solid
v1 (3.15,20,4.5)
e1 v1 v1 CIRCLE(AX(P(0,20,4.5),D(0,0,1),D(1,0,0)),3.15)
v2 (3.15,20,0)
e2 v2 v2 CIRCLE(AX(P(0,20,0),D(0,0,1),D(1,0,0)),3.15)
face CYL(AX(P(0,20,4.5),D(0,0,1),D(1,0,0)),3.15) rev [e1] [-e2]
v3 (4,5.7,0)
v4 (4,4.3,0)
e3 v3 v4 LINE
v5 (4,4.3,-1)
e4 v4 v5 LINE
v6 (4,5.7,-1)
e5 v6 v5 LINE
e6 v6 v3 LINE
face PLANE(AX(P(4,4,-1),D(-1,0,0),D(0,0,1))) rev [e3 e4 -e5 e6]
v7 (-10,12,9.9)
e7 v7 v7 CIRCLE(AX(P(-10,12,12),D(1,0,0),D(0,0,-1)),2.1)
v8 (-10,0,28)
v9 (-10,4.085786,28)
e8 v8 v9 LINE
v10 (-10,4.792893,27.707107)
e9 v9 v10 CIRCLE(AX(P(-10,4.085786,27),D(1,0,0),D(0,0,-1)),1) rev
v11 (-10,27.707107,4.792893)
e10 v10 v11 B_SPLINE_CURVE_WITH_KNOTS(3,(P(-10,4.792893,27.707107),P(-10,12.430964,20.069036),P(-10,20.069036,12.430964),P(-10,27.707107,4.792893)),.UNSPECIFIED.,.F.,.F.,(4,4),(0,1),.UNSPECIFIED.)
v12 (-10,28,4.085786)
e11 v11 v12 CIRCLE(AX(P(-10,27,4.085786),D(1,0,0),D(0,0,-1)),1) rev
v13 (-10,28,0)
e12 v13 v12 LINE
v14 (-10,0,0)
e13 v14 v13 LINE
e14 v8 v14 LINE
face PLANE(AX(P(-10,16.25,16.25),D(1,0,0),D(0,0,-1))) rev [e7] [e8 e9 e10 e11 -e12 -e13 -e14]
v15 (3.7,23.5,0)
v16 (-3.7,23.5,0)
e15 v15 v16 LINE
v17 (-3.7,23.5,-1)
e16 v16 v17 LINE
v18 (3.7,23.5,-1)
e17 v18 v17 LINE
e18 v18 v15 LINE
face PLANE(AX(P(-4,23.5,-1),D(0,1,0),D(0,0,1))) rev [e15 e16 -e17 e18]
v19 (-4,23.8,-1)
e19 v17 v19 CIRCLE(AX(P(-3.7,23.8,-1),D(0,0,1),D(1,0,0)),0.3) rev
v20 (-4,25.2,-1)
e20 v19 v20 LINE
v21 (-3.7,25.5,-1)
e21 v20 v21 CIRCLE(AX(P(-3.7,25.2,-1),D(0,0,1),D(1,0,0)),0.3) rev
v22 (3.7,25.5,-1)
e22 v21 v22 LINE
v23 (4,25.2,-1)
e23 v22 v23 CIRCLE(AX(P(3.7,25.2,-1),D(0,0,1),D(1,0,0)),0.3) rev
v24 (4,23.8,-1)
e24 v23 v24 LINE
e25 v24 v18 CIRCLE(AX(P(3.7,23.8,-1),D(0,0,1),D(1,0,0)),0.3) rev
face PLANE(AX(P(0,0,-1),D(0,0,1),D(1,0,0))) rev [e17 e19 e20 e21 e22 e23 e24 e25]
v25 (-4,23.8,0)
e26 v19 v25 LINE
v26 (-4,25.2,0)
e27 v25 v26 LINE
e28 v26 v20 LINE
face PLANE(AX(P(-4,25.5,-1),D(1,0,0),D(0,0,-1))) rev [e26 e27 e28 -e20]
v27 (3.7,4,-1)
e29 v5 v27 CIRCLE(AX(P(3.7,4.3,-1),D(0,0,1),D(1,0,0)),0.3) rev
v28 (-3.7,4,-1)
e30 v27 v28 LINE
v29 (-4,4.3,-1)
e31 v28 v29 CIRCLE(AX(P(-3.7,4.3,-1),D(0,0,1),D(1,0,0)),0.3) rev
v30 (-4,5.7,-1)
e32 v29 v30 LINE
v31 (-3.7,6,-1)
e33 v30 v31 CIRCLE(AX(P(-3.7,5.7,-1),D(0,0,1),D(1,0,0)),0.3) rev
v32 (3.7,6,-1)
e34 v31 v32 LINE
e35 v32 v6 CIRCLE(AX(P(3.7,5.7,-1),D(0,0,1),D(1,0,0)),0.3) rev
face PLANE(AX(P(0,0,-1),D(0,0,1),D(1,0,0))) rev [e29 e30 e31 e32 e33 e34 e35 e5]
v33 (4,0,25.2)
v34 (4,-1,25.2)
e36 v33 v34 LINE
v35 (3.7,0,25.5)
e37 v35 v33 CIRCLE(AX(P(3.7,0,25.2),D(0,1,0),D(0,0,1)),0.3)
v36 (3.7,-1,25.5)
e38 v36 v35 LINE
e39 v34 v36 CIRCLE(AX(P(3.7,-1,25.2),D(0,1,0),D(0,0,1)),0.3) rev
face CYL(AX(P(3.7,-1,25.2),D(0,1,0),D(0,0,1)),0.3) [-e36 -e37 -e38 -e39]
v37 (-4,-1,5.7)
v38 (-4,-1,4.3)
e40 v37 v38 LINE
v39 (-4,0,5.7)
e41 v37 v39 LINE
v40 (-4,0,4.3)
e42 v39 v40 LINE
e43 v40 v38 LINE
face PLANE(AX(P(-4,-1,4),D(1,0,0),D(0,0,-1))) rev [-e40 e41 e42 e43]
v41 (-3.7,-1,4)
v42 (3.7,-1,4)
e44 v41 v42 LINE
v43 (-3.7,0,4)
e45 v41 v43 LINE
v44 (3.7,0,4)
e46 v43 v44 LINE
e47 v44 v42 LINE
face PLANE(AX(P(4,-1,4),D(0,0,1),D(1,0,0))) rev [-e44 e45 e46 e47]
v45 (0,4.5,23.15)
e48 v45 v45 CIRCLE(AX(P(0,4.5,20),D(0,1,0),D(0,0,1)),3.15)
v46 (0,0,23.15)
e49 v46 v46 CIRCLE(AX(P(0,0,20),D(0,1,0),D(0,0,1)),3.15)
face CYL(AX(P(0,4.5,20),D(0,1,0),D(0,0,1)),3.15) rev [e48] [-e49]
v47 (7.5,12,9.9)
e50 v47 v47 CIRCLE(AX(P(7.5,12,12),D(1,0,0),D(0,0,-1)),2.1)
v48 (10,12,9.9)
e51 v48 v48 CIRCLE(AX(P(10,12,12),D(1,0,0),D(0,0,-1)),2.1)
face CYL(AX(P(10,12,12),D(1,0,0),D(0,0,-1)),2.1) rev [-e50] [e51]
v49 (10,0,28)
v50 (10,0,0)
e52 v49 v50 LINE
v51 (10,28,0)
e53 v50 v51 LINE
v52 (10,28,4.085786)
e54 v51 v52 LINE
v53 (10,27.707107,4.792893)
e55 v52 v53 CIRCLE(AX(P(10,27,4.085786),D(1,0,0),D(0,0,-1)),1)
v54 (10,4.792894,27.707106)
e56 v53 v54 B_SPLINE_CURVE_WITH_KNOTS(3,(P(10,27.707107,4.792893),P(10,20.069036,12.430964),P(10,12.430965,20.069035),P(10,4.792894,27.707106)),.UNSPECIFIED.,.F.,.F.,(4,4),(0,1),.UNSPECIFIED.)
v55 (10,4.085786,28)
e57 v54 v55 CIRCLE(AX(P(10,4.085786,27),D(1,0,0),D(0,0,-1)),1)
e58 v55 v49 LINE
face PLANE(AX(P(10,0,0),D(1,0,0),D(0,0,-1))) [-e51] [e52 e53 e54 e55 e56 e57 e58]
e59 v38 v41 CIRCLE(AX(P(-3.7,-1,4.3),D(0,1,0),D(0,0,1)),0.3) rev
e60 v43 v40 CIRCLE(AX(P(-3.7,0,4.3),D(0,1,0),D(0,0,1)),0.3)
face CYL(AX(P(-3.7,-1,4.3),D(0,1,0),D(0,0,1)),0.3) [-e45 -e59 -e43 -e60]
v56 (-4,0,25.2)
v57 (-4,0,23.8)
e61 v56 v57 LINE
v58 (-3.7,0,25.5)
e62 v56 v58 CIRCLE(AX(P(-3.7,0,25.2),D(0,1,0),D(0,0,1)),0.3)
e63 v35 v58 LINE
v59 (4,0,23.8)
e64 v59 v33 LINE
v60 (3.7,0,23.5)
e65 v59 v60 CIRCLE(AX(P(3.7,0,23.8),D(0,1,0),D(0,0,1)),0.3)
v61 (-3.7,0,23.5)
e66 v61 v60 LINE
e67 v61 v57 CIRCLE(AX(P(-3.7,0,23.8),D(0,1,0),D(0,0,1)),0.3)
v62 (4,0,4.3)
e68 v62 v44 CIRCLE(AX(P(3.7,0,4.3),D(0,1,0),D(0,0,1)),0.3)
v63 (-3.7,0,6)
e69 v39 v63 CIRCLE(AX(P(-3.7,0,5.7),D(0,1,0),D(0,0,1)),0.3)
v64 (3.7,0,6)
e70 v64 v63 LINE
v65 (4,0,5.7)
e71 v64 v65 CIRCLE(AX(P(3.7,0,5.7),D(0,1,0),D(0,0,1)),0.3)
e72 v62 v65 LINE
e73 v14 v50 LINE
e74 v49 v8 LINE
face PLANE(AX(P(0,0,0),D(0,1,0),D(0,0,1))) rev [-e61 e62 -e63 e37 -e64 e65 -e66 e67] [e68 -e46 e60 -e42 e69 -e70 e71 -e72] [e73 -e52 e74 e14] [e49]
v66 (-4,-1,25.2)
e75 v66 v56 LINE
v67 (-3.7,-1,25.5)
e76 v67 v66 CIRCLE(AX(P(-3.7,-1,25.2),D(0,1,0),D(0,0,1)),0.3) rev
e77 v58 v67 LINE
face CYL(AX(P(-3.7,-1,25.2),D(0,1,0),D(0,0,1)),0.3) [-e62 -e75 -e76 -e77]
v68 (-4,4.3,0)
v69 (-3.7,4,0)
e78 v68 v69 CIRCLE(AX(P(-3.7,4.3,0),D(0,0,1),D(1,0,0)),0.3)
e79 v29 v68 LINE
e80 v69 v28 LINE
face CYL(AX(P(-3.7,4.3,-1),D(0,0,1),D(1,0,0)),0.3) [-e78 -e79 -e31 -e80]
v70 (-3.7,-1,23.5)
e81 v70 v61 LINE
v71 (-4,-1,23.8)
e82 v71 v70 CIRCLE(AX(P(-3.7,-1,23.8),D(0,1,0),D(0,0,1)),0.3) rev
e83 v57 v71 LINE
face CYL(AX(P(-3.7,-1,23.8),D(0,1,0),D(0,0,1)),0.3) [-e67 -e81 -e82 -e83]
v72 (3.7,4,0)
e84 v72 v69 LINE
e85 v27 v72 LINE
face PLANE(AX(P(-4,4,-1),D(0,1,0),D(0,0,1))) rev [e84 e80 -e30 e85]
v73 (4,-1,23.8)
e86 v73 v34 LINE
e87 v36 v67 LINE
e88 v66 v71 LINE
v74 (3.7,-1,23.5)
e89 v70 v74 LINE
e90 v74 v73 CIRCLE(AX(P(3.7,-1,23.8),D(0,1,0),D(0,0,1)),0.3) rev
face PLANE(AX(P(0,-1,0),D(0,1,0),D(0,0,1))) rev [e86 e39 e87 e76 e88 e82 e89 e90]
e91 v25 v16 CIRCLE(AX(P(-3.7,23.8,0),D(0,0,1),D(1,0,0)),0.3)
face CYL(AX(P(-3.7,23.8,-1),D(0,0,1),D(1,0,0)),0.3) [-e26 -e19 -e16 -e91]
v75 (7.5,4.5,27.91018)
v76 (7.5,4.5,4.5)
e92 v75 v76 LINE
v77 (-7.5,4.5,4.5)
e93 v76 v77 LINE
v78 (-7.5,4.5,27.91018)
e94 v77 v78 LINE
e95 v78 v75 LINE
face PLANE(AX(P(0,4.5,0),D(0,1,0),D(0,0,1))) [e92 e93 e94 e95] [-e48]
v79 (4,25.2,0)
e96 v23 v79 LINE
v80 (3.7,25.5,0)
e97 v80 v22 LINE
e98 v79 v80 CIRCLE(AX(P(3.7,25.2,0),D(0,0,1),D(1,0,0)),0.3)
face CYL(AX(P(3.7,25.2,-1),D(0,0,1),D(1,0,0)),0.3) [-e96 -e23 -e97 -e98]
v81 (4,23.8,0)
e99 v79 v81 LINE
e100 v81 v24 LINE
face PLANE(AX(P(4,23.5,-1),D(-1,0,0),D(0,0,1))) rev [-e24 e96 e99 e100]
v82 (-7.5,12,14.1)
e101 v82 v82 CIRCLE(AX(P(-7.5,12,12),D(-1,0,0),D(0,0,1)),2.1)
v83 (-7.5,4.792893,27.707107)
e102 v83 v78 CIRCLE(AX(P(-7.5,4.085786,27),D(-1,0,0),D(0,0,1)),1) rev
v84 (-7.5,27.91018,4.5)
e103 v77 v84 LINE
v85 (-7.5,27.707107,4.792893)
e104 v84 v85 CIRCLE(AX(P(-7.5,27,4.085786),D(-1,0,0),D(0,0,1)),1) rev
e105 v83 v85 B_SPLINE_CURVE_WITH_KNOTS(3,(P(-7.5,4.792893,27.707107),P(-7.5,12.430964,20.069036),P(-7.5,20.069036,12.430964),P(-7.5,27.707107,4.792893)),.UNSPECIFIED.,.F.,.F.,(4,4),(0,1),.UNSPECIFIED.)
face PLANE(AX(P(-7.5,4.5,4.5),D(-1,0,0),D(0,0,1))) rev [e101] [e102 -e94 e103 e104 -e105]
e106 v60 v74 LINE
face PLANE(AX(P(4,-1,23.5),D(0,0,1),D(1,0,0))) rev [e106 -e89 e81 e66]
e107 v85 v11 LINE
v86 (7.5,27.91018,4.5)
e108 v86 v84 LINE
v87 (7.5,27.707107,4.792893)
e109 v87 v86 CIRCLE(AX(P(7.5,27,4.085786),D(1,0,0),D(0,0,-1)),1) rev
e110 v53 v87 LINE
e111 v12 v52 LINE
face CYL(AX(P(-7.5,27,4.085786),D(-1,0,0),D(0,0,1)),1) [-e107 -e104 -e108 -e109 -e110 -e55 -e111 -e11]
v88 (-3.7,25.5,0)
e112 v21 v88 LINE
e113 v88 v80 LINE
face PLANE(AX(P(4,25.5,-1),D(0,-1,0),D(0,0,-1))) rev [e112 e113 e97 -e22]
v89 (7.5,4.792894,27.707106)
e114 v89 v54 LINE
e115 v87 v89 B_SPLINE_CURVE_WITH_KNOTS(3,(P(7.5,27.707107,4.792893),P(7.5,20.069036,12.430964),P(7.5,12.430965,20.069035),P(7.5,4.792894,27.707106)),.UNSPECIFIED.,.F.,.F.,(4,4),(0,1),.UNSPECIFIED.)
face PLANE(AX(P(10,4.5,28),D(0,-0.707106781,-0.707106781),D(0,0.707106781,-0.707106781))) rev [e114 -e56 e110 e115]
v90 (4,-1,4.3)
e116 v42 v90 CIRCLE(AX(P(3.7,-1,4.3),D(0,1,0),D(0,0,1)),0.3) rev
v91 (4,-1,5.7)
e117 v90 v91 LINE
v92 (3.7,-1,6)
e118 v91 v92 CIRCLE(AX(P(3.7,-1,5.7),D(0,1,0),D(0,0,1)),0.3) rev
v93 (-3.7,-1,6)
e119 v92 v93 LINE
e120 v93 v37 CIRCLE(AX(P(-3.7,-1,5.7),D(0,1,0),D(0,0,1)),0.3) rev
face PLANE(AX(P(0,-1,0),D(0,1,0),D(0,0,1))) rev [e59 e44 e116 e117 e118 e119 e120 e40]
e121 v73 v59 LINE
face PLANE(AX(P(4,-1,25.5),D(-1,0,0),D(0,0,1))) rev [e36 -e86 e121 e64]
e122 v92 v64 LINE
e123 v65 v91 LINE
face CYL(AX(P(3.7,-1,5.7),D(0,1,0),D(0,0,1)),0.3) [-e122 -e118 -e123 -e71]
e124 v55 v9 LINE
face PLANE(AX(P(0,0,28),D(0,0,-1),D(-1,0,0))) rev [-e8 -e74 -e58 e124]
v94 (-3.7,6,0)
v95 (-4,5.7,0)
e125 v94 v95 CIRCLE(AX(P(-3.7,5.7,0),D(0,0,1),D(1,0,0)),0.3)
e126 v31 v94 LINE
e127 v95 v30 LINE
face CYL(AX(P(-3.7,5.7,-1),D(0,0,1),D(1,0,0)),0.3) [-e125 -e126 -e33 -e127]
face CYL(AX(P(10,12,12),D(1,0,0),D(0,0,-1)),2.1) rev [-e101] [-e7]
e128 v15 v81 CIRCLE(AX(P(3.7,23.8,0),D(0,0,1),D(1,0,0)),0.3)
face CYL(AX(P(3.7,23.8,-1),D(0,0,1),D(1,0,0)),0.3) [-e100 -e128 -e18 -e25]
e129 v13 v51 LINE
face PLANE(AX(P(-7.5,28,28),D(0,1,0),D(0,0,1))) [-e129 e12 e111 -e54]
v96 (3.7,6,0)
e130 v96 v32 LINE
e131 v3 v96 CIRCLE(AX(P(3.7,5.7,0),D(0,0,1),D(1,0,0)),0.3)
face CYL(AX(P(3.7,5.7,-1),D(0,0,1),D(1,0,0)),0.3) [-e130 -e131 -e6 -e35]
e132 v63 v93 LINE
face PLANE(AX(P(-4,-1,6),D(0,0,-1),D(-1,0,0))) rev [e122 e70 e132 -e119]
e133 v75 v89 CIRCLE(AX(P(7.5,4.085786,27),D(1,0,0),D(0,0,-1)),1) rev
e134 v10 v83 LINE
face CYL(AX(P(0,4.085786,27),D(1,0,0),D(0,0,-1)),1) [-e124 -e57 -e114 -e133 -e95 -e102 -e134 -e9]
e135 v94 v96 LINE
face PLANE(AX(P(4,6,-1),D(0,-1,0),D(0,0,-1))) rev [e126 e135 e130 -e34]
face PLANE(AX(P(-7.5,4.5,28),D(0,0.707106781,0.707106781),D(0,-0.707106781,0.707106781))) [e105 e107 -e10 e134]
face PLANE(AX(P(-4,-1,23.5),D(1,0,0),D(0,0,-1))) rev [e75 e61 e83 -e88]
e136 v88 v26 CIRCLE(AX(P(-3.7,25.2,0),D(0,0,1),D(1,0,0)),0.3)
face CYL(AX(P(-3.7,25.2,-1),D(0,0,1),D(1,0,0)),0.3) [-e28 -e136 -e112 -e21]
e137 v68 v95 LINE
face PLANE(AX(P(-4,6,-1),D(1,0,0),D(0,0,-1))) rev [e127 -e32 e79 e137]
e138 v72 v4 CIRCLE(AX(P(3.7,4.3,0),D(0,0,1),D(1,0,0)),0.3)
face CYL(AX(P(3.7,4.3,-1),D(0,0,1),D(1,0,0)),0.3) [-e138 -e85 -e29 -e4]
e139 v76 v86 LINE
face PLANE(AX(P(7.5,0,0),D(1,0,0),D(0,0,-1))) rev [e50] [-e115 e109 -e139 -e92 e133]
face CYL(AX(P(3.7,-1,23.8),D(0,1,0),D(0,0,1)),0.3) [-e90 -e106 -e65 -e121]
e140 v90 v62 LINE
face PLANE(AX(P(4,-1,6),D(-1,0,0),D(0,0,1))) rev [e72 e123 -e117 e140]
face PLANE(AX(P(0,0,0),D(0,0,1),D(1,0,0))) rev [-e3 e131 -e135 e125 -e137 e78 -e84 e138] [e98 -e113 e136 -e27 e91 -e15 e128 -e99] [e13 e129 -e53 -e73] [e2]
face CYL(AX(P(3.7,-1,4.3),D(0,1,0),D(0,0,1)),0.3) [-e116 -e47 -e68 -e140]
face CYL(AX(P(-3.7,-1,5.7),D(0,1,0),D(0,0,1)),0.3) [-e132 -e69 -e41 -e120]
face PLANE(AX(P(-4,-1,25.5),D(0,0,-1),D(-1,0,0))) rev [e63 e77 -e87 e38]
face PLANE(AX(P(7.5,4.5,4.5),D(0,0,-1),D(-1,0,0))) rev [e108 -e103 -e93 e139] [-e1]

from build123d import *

# Parameters (mm, degrees)
ESTRUSIONE_ESTRUSIONE1_DEPTH = 2.5
SCHIZZO2_W                   = 15
SCHIZZO2_H                   = 23.5
ESTRUSIONE_ESTRUSIONE2_DEPTH = 23.5
SCHIZZO3_W                   = 17.5
SCHIZZO3_H                   = 23.5
ESTRUSIONE_ESTRUSIONE3_DEPTH = 4.5
SCHIZZO4_W                   = 17.5
SCHIZZO4_H                   = 28
ESTRUSIONE_ESTRUSIONE4_DEPTH = 4.5
SCHIZZO5_W                   = 15
SCHIZZO5_H                   = 23.5
TAGLIO_ESTRUSIONE1_DEPTH     = 23.5
ESTRUSIONE_ESTRUSIONE5_DEPTH = 2.5
SCHIZZO7_W                   = 8
SCHIZZO7_H                   = 2
ESTRUSIONE_ESTRUSIONE6_DEPTH = 1
SCHIZZO8_W                   = 8
SCHIZZO8_H                   = 2
ESTRUSIONE_ESTRUSIONE7_DEPTH = 1
SCHIZZO9_W                   = 8
SCHIZZO9_H                   = 2
ESTRUSIONE_ESTRUSIONE8_DEPTH = 1
SCHIZZO10_W                  = 8
SCHIZZO10_H                  = 2
ESTRUSIONE_ESTRUSIONE9_DEPTH = 1
FORO_6_3_6_3_1_D             = 6.3
FORO_6_3_6_3_1_DEPTH         = 5.5
FORO_6_3_6_3_2_D             = 6.3
FORO_6_3_6_3_2_DEPTH         = 5.5
RACCORDO1_R                  = 0.3
RACCORDO2_START              = -11
RACCORDO2_DEPTH              = 22
FORO_FILETTATO_M5_1_D        = 4.2


with BuildPart() as part:
    # Schizzo1 → Estrusione-Estrusione1 (new body)
    with BuildSketch(Plane(origin=(-10, 0, 0), x_dir=(0, -1, 0), z_dir=(-1, 0, 0))):
        with BuildLine():
            Line((-27.707106781, 4.792893219), (-28, 4.5))
            Line((-28, 4.5), (-4.5, 4.5))
            Line((-4.5, 4.5), (-4.5, 28))
            Line((-4.5, 28), (-4.792893219, 27.707106781))
            add(Edge.make_bspline(
                [(-4.792893219, 27.707106781), (-12.430964406, 20.069035594), (-20.069035594, 12.430964406), (-27.707106781, 4.792893219)],
                knots=[0, 0, 0, 0, 1, 1, 1, 1], degree=3))
        make_face()
    extrude(amount=-ESTRUSIONE_ESTRUSIONE1_DEPTH)

    # Schizzo2 → Estrusione-Estrusione2 (add)
    with BuildSketch(Plane(origin=(0, 0, 4.5), x_dir=(-1, 0, 0), z_dir=(0, 0, -1))):
        with Locations((0, 16.25)):
            Rectangle(SCHIZZO2_W, SCHIZZO2_H)
    extrude(amount=-ESTRUSIONE_ESTRUSIONE2_DEPTH)

    # Schizzo3 → Estrusione-Estrusione3 (add)
    with BuildSketch(Plane(origin=(0, 0, 4.5), x_dir=(-1, 0, 0), z_dir=(0, 0, -1))):
        with Locations((1.25, 16.25)):
            Rectangle(SCHIZZO3_W, SCHIZZO3_H)
    extrude(amount=ESTRUSIONE_ESTRUSIONE3_DEPTH)

    # Schizzo4 → Estrusione-Estrusione4 (add)
    with BuildSketch(Plane.XZ.offset(-4.5)):
        with Locations((-1.25, 14)):
            Rectangle(SCHIZZO4_W, SCHIZZO4_H)
    extrude(amount=ESTRUSIONE_ESTRUSIONE4_DEPTH)

    # Schizzo5 → Taglio-Estrusione1 (cut)
    with BuildSketch(Plane(origin=(0, 28, 0), x_dir=(-1, 0, 0), z_dir=(0, 1, 0))):
        with Locations((0, 16.25)):
            Rectangle(SCHIZZO5_W, SCHIZZO5_H)
    extrude(amount=-TAGLIO_ESTRUSIONE1_DEPTH, mode=Mode.SUBTRACT)

    # Schizzo6 → Estrusione-Estrusione5 (add)
    with BuildSketch(Plane(origin=(7.5, 0, 0), x_dir=(0, 0, -1), z_dir=(1, 0, 0))):
        with BuildLine():
            Line((-28, 0), (-28, 4.5))
            Line((-28, 4.5), (-27.707106492, 4.792893508))
            add(Edge.make_bspline(
                [(-4.792893219, 27.707106781), (-12.43096431, 20.06903569), (-20.069035401, 12.430964599), (-27.707106492, 4.792893508)],
                knots=[0, 0, 0, 0, 1, 1, 1, 1], degree=3))
            Line((-4.792893219, 27.707106781), (-4.5, 28))
            Line((-4.5, 28), (0, 28))
            Line((0, 28), (0, 0))
            Line((0, 0), (-28, 0))
        make_face()
    extrude(amount=ESTRUSIONE_ESTRUSIONE5_DEPTH)

    # Schizzo7 → Estrusione-Estrusione6 (add)
    with BuildSketch(Plane(origin=(0, 0, 0), x_dir=(-1, 0, 0), z_dir=(0, 0, -1))):
        with Locations((0, 5)):
            Rectangle(SCHIZZO7_W, SCHIZZO7_H)
    extrude(amount=ESTRUSIONE_ESTRUSIONE6_DEPTH)

    # Schizzo8 → Estrusione-Estrusione7 (add)
    with BuildSketch(Plane(origin=(0, 0, 0), x_dir=(-1, 0, 0), z_dir=(0, 0, -1))):
        with Locations((0, 24.5)):
            Rectangle(SCHIZZO8_W, SCHIZZO8_H)
    extrude(amount=ESTRUSIONE_ESTRUSIONE7_DEPTH)

    # Schizzo9 → Estrusione-Estrusione8 (add)
    with BuildSketch(Plane.XZ):
        with Locations((0, 24.5)):
            Rectangle(SCHIZZO9_W, SCHIZZO9_H)
    extrude(amount=ESTRUSIONE_ESTRUSIONE8_DEPTH)

    # Schizzo10 → Estrusione-Estrusione9 (add)
    with BuildSketch(Plane.XZ):
        with Locations((0, 5)):
            Rectangle(SCHIZZO10_W, SCHIZZO10_H)
    extrude(amount=ESTRUSIONE_ESTRUSIONE9_DEPTH)

    # Foro Ø6.3 (6.3)-1
    with Locations(Plane(origin=(0, 4.5, 0), x_dir=(1, 0, 0), z_dir=(0, 1, 0))):
        with Locations((0, -20)):
            Hole(FORO_6_3_6_3_1_D / 2, depth=FORO_6_3_6_3_1_DEPTH)

    # Foro Ø6.3 (6.3)-2
    with Locations(Plane.XY.offset(4.5)):
        with Locations((0, 20)):
            Hole(FORO_6_3_6_3_2_D / 2, depth=FORO_6_3_6_3_2_DEPTH)

    # Raccordo1
    raccordo1_edges = [part.edges().sort_by_distance(p)[0] for p in [
        (-4, 23.5, -0.5),
        (-4, 25.5, -0.5),
        (4, 25.5, -0.5),
        (4, 23.5, -0.5),
        (4, -0.5, 25.5),
        (-4, -0.5, 25.5),
        (-4, -0.5, 23.5),
        (4, -0.5, 23.5),
        (4, -0.5, 6),
        (-4, -0.5, 6),
        (-4, -0.5, 4),
        (4, -0.5, 4),
        (-4, 4, -0.5),
        (-4, 6, -0.5),
        (4, 6, -0.5),
        (4, 4, -0.5),
    ]]
    fillet(raccordo1_edges, radius=RACCORDO1_R)

    # Raccordo2: read off the stored shape, not the designer's step
    # Raccordo2 outline → Raccordo2 (cut)
    with BuildSketch(Plane.YZ.offset(RACCORDO2_START)):
        with BuildLine():
            ThreePointArc((4.5, 27.910179721), (4.655566811, 27.82179701), (4.792893508, 27.707106492))
            Line((4.792893508, 27.707106492), (4.5, 28))
            Line((4.5, 28), (4.5, 27.910179721))
        make_face()
        with BuildLine():
            ThreePointArc((4.085786438, 28), (4.297706563, 27.97728699), (4.5, 27.910179721))
            Line((4.5, 27.910179721), (4.5, 28))
            Line((4.5, 28), (4.085786438, 28))
        make_face()
        with BuildLine():
            Line((28, 4.5), (27.707106781, 4.792893219))
            ThreePointArc((27.707106781, 4.792893219), (27.821797127, 4.655566644), (27.910179722, 4.5))
            Line((27.910179722, 4.5), (28, 4.5))
        make_face()
        with BuildLine():
            Line((28, 4.5), (27.910179722, 4.5))
            ThreePointArc((27.910179722, 4.5), (27.97728699, 4.297706563), (28, 4.085786438))
            Line((28, 4.085786438), (28, 4.5))
        make_face()
    extrude(amount=RACCORDO2_DEPTH, mode=Mode.SUBTRACT)

    # Foro filettato M5-1 (through all)
    with Locations(Plane(origin=(10, 12, 12), x_dir=(0, 0, 1), z_dir=(1, 0, 0))):
        with Locations((0, 0)):
            Hole(FORO_FILETTATO_M5_1_D / 2)


solid = part.part
